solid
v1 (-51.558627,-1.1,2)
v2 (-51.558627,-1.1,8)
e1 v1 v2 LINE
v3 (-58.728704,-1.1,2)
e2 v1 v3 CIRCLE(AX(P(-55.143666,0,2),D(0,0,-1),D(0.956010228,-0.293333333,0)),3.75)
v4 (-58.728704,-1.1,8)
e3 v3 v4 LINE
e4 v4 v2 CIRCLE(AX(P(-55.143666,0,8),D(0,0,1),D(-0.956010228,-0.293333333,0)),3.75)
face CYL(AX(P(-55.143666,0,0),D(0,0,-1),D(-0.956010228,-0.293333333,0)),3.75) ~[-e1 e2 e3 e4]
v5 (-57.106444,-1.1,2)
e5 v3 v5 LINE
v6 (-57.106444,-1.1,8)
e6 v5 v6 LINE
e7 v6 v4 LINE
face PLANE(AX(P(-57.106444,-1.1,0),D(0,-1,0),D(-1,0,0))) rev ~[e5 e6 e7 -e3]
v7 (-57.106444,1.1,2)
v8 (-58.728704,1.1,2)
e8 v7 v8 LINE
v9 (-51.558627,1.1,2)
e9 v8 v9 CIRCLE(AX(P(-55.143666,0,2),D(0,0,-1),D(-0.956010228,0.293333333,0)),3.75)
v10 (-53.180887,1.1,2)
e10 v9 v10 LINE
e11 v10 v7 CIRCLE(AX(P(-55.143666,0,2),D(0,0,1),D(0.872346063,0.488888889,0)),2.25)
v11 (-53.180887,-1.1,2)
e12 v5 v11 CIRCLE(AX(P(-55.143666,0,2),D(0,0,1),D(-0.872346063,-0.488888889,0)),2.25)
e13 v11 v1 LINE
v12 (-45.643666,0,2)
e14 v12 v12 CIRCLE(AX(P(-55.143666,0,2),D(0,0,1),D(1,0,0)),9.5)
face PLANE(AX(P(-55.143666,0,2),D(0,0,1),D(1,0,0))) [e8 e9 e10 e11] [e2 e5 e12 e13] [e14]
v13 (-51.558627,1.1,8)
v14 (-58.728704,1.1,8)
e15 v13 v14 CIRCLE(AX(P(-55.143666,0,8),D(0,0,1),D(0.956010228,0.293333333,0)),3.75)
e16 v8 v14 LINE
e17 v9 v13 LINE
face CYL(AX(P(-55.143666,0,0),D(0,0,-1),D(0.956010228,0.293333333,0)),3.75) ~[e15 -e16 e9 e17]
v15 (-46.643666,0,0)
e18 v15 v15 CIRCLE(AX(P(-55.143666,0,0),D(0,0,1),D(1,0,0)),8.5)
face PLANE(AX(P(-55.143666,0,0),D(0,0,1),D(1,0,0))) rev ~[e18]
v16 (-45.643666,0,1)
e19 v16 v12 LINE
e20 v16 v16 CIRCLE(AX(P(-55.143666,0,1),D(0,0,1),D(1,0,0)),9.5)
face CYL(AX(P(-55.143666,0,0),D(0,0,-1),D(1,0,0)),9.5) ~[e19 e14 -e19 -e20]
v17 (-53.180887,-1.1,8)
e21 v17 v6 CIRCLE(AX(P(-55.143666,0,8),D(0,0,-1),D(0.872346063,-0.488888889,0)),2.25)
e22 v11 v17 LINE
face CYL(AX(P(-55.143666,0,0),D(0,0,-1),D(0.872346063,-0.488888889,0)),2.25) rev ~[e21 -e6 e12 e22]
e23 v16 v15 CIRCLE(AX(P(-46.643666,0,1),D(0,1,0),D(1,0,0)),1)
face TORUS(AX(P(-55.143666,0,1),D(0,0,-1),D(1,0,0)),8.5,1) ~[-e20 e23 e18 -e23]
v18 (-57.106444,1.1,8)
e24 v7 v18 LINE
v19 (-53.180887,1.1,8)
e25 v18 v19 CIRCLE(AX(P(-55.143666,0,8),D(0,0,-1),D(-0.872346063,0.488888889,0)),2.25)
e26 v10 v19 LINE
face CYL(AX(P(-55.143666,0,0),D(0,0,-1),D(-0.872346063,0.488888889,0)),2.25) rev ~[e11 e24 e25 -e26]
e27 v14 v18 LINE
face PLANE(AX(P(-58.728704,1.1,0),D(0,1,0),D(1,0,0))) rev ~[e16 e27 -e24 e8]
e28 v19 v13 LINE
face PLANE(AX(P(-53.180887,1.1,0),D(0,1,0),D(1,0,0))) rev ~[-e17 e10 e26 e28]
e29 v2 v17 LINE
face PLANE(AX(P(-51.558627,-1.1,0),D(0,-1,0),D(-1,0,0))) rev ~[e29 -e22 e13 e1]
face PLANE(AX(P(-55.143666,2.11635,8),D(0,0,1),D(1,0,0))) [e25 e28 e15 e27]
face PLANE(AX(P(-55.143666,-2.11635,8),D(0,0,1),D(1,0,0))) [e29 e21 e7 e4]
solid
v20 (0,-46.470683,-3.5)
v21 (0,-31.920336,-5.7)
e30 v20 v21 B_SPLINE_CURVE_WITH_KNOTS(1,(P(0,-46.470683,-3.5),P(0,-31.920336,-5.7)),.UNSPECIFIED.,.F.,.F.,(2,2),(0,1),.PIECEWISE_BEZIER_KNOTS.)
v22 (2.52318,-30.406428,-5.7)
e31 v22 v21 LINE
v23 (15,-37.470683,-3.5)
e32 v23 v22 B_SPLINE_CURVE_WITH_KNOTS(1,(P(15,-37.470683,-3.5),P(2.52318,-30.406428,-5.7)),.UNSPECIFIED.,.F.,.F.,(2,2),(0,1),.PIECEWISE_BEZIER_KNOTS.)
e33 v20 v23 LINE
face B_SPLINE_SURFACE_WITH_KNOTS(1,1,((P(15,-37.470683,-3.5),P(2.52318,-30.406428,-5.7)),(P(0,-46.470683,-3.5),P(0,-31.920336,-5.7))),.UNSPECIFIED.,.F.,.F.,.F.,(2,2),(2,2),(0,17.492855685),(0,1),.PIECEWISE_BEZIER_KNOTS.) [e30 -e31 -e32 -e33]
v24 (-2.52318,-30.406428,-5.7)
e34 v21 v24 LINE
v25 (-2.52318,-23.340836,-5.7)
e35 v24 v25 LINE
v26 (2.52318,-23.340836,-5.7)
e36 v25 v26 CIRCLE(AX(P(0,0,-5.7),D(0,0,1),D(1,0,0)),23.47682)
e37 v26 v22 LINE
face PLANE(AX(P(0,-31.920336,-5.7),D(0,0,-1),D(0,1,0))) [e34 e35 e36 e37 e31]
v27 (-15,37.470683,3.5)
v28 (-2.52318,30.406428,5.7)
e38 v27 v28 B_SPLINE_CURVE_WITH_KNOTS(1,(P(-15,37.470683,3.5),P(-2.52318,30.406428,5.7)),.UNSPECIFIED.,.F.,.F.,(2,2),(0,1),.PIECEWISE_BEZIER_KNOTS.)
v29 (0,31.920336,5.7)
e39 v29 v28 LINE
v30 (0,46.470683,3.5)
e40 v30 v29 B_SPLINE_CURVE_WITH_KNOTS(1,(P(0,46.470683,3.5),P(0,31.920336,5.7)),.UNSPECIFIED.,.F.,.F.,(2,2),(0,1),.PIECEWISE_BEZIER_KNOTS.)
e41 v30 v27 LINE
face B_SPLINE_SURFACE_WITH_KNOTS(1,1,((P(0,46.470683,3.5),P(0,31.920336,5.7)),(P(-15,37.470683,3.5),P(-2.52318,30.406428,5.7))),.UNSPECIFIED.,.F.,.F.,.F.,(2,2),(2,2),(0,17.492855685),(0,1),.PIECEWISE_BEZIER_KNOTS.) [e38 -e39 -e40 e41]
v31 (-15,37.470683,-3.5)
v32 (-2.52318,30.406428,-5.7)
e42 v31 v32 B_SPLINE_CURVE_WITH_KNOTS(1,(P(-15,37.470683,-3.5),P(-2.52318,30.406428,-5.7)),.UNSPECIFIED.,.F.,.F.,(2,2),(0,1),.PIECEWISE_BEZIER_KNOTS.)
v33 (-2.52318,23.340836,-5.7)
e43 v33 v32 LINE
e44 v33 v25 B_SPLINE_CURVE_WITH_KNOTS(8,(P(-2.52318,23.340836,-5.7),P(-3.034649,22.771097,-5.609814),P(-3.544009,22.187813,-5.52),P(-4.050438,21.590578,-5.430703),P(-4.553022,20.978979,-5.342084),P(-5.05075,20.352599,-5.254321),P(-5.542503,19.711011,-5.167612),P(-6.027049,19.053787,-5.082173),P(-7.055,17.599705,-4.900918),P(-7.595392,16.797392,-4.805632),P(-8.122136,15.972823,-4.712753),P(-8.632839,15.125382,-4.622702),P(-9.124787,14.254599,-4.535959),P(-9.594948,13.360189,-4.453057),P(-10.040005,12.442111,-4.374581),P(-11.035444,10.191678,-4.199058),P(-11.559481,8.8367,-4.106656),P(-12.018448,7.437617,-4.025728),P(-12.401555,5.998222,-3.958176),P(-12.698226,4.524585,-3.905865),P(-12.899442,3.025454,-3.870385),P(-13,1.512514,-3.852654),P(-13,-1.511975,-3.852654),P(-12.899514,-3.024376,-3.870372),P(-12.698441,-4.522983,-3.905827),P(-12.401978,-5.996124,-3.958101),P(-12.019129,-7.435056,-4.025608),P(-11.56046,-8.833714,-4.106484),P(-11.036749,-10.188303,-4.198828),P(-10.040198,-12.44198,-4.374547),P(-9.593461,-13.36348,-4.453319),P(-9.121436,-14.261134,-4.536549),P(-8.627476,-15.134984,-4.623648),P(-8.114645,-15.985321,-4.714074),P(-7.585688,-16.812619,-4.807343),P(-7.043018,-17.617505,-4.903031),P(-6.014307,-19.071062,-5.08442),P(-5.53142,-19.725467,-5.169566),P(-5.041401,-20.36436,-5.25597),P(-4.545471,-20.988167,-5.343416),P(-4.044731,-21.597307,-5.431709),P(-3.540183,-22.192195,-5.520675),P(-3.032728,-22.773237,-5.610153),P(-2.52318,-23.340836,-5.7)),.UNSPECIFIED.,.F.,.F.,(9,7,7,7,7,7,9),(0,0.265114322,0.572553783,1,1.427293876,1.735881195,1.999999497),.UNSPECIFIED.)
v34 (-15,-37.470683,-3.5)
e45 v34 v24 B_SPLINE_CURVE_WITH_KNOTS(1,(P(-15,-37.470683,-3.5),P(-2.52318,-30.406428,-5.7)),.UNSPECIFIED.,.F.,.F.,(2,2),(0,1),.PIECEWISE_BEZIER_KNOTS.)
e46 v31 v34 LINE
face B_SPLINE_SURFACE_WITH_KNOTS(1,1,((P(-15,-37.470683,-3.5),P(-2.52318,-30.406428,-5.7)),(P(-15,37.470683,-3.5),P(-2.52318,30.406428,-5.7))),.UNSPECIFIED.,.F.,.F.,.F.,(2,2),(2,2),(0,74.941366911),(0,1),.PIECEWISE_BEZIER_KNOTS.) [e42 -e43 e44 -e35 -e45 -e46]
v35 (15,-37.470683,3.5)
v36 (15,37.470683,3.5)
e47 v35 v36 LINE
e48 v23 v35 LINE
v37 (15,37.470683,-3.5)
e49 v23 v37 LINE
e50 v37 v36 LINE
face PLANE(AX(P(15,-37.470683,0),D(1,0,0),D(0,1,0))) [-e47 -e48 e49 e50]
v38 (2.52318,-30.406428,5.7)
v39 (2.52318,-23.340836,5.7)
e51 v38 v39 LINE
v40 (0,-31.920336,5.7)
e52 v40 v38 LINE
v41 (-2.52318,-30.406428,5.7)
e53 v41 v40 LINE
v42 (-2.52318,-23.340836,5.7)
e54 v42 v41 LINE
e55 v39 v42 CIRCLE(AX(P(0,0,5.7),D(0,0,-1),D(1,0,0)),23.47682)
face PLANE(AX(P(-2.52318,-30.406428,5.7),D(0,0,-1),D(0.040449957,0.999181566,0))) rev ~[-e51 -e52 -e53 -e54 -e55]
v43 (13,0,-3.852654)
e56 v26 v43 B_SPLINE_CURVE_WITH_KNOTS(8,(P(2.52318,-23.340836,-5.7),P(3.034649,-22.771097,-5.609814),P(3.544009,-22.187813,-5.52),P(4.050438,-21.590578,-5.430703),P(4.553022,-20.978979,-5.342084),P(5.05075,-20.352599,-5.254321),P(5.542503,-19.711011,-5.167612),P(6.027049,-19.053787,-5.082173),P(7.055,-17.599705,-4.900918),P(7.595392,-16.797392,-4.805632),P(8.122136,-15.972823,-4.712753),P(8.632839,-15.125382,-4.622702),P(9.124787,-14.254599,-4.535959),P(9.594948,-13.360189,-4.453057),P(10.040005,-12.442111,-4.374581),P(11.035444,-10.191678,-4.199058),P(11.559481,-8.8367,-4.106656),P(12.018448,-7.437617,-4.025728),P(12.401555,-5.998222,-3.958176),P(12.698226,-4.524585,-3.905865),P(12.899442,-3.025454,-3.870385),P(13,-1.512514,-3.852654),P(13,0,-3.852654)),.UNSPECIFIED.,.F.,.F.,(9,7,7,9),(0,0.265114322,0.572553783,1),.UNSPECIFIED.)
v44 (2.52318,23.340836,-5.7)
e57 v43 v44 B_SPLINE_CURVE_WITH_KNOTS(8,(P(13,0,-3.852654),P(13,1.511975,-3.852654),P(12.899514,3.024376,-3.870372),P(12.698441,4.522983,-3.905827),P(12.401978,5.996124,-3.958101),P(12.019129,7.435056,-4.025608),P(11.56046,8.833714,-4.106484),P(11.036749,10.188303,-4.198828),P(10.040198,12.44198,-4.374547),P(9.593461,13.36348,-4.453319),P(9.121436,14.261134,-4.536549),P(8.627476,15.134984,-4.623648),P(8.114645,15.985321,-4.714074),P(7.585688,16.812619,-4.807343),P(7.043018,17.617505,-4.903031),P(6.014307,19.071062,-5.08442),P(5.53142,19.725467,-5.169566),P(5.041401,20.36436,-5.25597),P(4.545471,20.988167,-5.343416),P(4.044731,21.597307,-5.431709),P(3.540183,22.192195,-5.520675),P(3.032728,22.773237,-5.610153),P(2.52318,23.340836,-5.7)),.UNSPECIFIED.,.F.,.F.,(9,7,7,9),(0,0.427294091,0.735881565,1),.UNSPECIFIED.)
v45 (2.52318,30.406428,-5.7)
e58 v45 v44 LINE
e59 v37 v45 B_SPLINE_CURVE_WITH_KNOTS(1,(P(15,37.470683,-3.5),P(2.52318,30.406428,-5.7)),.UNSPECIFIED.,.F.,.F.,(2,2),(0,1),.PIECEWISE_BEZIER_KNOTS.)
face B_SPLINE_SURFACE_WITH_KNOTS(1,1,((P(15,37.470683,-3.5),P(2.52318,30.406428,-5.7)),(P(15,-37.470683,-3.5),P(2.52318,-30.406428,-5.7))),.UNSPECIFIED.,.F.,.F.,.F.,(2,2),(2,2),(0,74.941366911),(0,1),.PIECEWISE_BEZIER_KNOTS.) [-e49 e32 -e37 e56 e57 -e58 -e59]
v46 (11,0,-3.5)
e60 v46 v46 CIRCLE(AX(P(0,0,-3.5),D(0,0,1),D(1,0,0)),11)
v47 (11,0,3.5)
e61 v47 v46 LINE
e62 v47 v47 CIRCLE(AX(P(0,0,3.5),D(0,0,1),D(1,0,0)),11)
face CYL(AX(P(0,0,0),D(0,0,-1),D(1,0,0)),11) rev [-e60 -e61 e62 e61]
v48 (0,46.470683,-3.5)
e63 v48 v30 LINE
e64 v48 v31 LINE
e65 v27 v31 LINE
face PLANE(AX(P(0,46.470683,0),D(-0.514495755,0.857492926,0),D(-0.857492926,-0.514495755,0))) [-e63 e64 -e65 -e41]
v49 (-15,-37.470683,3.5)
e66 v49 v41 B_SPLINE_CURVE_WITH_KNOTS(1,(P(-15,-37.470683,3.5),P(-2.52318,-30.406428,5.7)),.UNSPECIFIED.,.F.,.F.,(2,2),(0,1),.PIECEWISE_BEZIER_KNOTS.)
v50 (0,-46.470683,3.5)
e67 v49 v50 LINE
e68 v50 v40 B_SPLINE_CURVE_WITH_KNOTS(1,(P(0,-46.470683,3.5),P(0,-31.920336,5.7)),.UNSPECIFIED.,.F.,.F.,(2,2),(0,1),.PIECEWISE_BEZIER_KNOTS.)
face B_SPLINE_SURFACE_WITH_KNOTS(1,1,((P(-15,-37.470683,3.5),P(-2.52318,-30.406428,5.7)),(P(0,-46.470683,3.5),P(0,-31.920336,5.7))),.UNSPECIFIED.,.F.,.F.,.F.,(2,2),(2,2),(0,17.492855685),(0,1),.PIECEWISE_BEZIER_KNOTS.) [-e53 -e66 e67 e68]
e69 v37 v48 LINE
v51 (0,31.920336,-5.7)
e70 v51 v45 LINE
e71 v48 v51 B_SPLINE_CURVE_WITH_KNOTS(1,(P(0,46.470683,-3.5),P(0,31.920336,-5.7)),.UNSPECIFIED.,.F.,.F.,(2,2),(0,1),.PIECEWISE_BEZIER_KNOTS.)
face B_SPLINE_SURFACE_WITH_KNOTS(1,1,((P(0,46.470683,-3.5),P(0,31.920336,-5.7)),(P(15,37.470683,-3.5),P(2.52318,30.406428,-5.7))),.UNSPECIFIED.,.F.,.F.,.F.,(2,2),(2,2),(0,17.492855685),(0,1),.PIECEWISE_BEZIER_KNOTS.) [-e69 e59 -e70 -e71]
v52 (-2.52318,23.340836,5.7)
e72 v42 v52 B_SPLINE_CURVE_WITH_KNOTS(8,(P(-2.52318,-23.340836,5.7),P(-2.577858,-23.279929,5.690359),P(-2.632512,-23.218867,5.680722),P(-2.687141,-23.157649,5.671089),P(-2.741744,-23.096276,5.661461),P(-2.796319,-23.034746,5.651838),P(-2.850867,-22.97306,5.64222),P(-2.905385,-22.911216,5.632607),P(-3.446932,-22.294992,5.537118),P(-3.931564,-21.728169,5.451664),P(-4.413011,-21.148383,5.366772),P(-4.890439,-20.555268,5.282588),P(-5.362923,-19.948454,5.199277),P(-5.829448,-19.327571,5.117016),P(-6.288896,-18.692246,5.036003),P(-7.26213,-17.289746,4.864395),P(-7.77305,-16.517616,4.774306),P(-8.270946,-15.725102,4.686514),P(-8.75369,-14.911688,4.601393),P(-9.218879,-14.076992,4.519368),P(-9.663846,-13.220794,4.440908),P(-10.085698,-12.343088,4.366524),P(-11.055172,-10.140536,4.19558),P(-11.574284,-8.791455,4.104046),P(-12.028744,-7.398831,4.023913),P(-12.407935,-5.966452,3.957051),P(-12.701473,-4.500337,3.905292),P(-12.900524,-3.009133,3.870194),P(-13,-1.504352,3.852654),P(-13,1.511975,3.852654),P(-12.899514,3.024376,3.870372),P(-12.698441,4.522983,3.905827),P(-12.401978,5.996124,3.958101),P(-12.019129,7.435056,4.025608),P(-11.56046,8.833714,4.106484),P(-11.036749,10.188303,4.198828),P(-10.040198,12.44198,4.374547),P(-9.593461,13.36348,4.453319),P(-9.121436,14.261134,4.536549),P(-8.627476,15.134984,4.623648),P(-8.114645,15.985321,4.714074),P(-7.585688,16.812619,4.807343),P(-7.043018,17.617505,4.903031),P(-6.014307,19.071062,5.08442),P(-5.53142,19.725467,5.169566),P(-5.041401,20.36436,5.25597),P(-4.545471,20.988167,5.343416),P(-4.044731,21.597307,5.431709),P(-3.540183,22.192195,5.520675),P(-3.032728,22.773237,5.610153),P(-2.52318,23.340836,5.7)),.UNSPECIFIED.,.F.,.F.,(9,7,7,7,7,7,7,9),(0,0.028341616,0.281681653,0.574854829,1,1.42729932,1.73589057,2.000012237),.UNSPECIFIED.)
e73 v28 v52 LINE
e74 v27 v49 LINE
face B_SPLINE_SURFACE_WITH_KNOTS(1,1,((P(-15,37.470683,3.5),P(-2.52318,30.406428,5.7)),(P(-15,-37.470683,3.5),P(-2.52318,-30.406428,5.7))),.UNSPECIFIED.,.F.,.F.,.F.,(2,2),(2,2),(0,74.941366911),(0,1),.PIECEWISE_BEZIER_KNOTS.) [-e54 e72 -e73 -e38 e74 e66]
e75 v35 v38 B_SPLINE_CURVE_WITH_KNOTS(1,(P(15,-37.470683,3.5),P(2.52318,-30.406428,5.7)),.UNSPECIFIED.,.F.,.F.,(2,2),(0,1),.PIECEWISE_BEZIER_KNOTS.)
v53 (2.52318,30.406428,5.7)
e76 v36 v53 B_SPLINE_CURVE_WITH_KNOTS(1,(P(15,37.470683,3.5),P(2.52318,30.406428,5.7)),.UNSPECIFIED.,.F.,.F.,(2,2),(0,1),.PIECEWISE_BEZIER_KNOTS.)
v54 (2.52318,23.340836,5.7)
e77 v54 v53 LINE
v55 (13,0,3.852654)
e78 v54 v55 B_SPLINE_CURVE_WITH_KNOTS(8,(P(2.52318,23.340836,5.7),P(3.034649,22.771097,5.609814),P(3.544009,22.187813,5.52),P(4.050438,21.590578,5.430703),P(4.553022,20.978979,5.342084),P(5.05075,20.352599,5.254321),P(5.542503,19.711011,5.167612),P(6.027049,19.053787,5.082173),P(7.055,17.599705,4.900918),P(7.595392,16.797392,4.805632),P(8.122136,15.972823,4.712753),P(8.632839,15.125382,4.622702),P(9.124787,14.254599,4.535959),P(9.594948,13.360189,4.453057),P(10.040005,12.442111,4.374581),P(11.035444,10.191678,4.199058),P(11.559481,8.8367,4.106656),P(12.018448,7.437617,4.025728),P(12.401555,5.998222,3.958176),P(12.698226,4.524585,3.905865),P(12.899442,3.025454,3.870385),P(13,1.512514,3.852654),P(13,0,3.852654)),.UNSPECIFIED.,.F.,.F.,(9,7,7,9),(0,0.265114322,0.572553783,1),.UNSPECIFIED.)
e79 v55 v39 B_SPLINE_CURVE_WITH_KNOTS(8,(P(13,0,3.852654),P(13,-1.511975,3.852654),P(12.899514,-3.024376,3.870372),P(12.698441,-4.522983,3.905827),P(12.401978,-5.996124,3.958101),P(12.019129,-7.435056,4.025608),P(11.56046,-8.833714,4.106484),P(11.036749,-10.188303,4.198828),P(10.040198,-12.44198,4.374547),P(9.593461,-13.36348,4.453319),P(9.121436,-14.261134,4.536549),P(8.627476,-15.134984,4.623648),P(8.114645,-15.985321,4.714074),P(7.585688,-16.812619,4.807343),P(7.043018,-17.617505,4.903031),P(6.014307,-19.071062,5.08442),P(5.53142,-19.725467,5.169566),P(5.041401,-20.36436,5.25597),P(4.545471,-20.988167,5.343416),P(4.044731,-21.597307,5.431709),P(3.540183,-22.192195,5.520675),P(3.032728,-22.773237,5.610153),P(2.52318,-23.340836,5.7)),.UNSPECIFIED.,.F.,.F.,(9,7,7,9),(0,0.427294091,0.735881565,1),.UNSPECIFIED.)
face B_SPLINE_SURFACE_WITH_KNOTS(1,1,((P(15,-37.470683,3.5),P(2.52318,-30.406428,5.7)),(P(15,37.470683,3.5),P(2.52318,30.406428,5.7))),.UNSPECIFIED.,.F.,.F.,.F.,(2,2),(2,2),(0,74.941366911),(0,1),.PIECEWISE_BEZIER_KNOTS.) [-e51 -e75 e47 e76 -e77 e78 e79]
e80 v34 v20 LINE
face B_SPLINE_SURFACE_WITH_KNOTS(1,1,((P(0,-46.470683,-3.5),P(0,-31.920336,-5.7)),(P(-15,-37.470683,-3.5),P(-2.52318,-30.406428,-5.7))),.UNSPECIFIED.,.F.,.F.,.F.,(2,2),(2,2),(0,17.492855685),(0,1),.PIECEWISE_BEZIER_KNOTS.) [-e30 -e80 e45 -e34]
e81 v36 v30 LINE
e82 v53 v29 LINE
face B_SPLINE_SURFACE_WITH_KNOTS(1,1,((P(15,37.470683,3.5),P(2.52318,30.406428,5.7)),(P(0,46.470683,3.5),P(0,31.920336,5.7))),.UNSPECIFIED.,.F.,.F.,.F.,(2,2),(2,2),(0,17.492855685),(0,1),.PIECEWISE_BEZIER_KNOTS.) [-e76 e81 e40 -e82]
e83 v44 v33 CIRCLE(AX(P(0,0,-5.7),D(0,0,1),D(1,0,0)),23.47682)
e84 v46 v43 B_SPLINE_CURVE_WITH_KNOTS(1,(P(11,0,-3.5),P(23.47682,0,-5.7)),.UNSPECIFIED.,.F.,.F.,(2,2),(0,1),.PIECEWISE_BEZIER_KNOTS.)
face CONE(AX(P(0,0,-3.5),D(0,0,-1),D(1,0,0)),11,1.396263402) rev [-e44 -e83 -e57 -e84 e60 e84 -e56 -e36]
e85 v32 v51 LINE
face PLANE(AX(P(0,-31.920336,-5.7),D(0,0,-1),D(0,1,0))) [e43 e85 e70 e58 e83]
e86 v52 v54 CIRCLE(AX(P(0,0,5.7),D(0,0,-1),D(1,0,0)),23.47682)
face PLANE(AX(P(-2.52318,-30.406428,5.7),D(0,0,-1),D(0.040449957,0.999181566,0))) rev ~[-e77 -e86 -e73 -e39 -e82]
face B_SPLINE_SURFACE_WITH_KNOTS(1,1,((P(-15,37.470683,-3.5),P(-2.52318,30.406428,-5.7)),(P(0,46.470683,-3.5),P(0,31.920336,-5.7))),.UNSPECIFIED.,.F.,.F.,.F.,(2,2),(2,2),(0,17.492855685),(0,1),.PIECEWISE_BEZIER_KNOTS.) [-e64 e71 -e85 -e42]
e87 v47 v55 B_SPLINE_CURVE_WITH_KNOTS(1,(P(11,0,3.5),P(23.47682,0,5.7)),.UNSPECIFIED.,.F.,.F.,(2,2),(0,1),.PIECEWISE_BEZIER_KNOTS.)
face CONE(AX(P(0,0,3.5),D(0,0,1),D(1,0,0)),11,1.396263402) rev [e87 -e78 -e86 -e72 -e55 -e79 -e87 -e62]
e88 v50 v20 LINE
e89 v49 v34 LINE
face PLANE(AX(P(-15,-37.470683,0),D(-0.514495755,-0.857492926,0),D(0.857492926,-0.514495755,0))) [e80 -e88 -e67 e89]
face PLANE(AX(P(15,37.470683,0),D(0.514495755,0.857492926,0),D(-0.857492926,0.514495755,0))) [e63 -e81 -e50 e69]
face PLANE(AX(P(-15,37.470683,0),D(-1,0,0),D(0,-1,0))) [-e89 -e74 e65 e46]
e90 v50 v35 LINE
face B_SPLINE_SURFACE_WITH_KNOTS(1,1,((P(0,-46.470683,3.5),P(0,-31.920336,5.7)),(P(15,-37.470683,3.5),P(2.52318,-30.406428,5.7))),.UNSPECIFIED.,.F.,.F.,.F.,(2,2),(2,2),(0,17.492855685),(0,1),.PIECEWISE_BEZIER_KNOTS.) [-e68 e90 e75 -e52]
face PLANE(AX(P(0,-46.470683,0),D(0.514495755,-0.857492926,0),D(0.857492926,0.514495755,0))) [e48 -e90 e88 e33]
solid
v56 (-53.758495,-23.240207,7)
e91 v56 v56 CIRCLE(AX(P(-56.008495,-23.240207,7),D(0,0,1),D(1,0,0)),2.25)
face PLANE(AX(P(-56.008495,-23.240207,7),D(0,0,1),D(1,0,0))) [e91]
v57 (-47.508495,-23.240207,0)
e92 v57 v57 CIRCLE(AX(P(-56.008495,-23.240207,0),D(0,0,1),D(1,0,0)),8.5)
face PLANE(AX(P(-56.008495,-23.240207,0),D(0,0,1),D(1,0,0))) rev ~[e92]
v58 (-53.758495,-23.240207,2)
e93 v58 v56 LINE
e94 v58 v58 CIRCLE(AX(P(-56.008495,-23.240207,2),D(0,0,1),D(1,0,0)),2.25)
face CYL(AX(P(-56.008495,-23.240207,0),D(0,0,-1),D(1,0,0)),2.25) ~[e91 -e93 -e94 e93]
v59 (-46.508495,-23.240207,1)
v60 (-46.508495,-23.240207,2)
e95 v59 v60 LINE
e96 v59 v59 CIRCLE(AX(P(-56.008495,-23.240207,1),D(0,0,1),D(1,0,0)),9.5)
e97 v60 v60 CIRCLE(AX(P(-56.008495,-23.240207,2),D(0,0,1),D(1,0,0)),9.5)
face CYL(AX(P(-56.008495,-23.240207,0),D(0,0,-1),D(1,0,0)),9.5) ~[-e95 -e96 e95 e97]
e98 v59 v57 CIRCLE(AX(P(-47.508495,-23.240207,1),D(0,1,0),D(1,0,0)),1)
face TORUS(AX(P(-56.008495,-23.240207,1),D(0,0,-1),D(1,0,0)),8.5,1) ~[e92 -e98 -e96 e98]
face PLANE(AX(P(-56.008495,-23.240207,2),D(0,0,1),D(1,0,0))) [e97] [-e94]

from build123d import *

# Parameters (mm, degrees)
F0_R       = 11
F1_DEPTH   = 3.5
F3_DEPTH   = 8
F2_R       = 9.5
F4_DEPTH   = 2
F5_R       = 1
F6_R       = 9.5
F6_R_2     = 2.25
F7_DEPTH   = 2
F8_DEPTH   = 7
F9_R       = 1
F1_FACE_R  = 11
F1_FACE1_R = 11
F10_DEPTH  = 2.2
F10_TAPER  = 80


# Not quite as in the source:
# - a feature names something its author has since deleted; it is built from what else it names


with BuildPart() as f1:
    # F0 (on Top) → F1 (new body, symmetric)
    with BuildSketch(Plane.XY):
        Polygon((0, -46.4706834555), (15, -37.4706834555), (15, 37.4706834555), (0, 46.4706834555), (-15, 37.4706834555), (-15, -37.4706834555), align=None)
        Circle(F0_R, mode=Mode.SUBTRACT)
    extrude(amount=F1_DEPTH, both=True)

    # F1_face (on face) + F1_face1 (on face) → F10 (join, symmetric)
    with BuildSketch(Plane.XY.offset(3.5)):
        Polygon((-15, -37.4706834555), (0, -46.4706834555), (15, -37.4706834555), (15, 37.4706834555), (0, 46.4706834555), (-15, 37.4706834555), align=None)
        Circle(F1_FACE_R, mode=Mode.SUBTRACT)
    with BuildSketch(Plane(origin=(0, 0, -3.5), x_dir=(1, 0, 0), z_dir=(0, 0, -1))):
        Polygon((0, 46.4706834555), (-15, 37.4706834555), (-15, -37.4706834555), (0, -46.4706834555), (15, -37.4706834555), (15, 37.4706834555), align=None)
        Circle(F1_FACE1_R, mode=Mode.SUBTRACT)
    extrude(amount=F10_DEPTH, both=True, taper=F10_TAPER, dir=(0, 0, 1))


with BuildPart() as f3:
    # F2 (on Top) → F3 (new body)
    with BuildSketch(Plane.XY):
        with BuildLine():
            Line((-53.1808868797, 1.1), (-51.5586271683, 1.1))
            ThreePointArc((-51.5586271683, 1.1), (-55.1436655223, 3.75), (-58.7287038764, 1.1))
            Line((-58.7287038764, 1.1), (-57.106444165, 1.1))
            ThreePointArc((-57.106444165, 1.1), (-55.1436655223, 2.25), (-53.1808868797, 1.1))
        make_face()
    extrude(amount=F3_DEPTH)



with BuildPart() as f3b:
    # F2 (on Top) → F3, piece 2 (new body)
    with BuildSketch(Plane.XY):
        with BuildLine():
            ThreePointArc((-58.7287038764, -1.1), (-55.1436655223, -3.75), (-51.5586271683, -1.1))
            Line((-51.5586271683, -1.1), (-53.1808868797, -1.1))
            ThreePointArc((-53.1808868797, -1.1), (-55.1436655223, -2.25), (-57.106444165, -1.1))
            Line((-57.106444165, -1.1), (-58.7287038764, -1.1))
        make_face()
    extrude(amount=F3_DEPTH)


with BuildPart() as f3_1:
    add(f3.part)

    add(f3b.part)  # F4 merges F3b
    # F2 (on Top) → F4 (join)
    with BuildSketch(Plane.XY):
        with Locations((-55.1436655223, 0)):
            Circle(F2_R)
        with BuildLine():
            ThreePointArc((-51.5586271683, 1.1), (-51.4351352321, 0.556150237), (-51.3936655223, 0))
            ThreePointArc((-51.3936655223, 0), (-51.4351352321, -0.556150237), (-51.5586271683, -1.1))
            ThreePointArc((-51.5586271683, -1.1), (-55.1436655223, -3.75), (-58.7287038764, -1.1))
            ThreePointArc((-58.7287038764, -1.1), (-58.8936655223, 0), (-58.7287038764, 1.1))
            ThreePointArc((-58.7287038764, 1.1), (-55.1436655223, 3.75), (-51.5586271683, 1.1))
        make_face(mode=Mode.SUBTRACT)
        with BuildLine():
            ThreePointArc((-52.8936655223, 0), (-52.9666547339, 0.5684399942), (-53.1808868797, 1.1))
            Line((-53.1808868797, 1.1), (-57.106444165, 1.1))
            ThreePointArc((-57.106444165, 1.1), (-57.3936655223, 0), (-57.106444165, -1.1))
            Line((-57.106444165, -1.1), (-53.1808868797, -1.1))
            ThreePointArc((-53.1808868797, -1.1), (-52.9666547339, -0.5684399942), (-52.8936655223, 0))
        make_face()
        with BuildLine():
            Line((-51.5586271683, -1.1), (-51.5586271683, 1.1))
            Line((-51.5586271683, 1.1), (-53.1808868797, 1.1))
            ThreePointArc((-53.1808868797, 1.1), (-52.9666547339, 0.5684399942), (-52.8936655223, 0))
            ThreePointArc((-52.8936655223, 0), (-52.9666547339, -0.5684399942), (-53.1808868797, -1.1))
            Line((-53.1808868797, -1.1), (-51.5586271683, -1.1))
        make_face()
        with BuildLine():
            Line((-57.106444165, 1.1), (-53.1808868797, 1.1))
            ThreePointArc((-53.1808868797, 1.1), (-55.1436655223, 2.25), (-57.106444165, 1.1))
        make_face()
        with BuildLine():
            ThreePointArc((-57.106444165, -1.1), (-55.1436655223, -2.25), (-53.1808868797, -1.1))
            Line((-53.1808868797, -1.1), (-57.106444165, -1.1))
        make_face()
        with BuildLine():
            Line((-58.7287038764, -1.1), (-58.7287038764, 1.1))
            ThreePointArc((-58.7287038764, 1.1), (-58.8936655223, 0), (-58.7287038764, -1.1))
        make_face()
        with BuildLine():
            Line((-57.106444165, 1.1), (-58.7287038764, 1.1))
            Line((-58.7287038764, 1.1), (-58.7287038764, -1.1))
            Line((-58.7287038764, -1.1), (-57.106444165, -1.1))
            ThreePointArc((-57.106444165, -1.1), (-57.3936655223, 0), (-57.106444165, 1.1))
        make_face()
        with BuildLine():
            ThreePointArc((-51.5586271683, -1.1), (-51.4351352321, -0.556150237), (-51.3936655223, 0))
            ThreePointArc((-51.3936655223, 0), (-51.4351352321, 0.556150237), (-51.5586271683, 1.1))
            Line((-51.5586271683, 1.1), (-51.5586271683, -1.1))
        make_face()
    extrude(amount=F4_DEPTH)

    # F5
    f5_edges = [f3_1.edges().sort_by_distance(p)[0] for p in [
        (-64.643666, 0, 0),
    ]]
    fillet(f5_edges, radius=F5_R)


with BuildPart() as f7:
    # F6 (on Top) → F7 (new body)
    with BuildSketch(Plane.XY):
        with Locations((-56.0084953904, -23.2402067631)):
            Circle(F6_R)
        with Locations((-56.0084953904, -23.2402067631)):
            Circle(F6_R_2, mode=Mode.SUBTRACT)
    extrude(amount=F7_DEPTH)

    # F6 (on Top) → F8 (join)
    with BuildSketch(Plane.XY):
        with Locations((-56.0084953904, -23.2402067631)):
            Circle(F6_R_2)
    extrude(amount=F8_DEPTH)

    # F9
    f9_edges = [f7.edges().sort_by_distance(p)[0] for p in [
        (-65.508495, -23.240207, 0),
    ]]
    fillet(f9_edges, radius=F9_R)


solid = Compound([f1.part, f3_1.part, f7.part])
